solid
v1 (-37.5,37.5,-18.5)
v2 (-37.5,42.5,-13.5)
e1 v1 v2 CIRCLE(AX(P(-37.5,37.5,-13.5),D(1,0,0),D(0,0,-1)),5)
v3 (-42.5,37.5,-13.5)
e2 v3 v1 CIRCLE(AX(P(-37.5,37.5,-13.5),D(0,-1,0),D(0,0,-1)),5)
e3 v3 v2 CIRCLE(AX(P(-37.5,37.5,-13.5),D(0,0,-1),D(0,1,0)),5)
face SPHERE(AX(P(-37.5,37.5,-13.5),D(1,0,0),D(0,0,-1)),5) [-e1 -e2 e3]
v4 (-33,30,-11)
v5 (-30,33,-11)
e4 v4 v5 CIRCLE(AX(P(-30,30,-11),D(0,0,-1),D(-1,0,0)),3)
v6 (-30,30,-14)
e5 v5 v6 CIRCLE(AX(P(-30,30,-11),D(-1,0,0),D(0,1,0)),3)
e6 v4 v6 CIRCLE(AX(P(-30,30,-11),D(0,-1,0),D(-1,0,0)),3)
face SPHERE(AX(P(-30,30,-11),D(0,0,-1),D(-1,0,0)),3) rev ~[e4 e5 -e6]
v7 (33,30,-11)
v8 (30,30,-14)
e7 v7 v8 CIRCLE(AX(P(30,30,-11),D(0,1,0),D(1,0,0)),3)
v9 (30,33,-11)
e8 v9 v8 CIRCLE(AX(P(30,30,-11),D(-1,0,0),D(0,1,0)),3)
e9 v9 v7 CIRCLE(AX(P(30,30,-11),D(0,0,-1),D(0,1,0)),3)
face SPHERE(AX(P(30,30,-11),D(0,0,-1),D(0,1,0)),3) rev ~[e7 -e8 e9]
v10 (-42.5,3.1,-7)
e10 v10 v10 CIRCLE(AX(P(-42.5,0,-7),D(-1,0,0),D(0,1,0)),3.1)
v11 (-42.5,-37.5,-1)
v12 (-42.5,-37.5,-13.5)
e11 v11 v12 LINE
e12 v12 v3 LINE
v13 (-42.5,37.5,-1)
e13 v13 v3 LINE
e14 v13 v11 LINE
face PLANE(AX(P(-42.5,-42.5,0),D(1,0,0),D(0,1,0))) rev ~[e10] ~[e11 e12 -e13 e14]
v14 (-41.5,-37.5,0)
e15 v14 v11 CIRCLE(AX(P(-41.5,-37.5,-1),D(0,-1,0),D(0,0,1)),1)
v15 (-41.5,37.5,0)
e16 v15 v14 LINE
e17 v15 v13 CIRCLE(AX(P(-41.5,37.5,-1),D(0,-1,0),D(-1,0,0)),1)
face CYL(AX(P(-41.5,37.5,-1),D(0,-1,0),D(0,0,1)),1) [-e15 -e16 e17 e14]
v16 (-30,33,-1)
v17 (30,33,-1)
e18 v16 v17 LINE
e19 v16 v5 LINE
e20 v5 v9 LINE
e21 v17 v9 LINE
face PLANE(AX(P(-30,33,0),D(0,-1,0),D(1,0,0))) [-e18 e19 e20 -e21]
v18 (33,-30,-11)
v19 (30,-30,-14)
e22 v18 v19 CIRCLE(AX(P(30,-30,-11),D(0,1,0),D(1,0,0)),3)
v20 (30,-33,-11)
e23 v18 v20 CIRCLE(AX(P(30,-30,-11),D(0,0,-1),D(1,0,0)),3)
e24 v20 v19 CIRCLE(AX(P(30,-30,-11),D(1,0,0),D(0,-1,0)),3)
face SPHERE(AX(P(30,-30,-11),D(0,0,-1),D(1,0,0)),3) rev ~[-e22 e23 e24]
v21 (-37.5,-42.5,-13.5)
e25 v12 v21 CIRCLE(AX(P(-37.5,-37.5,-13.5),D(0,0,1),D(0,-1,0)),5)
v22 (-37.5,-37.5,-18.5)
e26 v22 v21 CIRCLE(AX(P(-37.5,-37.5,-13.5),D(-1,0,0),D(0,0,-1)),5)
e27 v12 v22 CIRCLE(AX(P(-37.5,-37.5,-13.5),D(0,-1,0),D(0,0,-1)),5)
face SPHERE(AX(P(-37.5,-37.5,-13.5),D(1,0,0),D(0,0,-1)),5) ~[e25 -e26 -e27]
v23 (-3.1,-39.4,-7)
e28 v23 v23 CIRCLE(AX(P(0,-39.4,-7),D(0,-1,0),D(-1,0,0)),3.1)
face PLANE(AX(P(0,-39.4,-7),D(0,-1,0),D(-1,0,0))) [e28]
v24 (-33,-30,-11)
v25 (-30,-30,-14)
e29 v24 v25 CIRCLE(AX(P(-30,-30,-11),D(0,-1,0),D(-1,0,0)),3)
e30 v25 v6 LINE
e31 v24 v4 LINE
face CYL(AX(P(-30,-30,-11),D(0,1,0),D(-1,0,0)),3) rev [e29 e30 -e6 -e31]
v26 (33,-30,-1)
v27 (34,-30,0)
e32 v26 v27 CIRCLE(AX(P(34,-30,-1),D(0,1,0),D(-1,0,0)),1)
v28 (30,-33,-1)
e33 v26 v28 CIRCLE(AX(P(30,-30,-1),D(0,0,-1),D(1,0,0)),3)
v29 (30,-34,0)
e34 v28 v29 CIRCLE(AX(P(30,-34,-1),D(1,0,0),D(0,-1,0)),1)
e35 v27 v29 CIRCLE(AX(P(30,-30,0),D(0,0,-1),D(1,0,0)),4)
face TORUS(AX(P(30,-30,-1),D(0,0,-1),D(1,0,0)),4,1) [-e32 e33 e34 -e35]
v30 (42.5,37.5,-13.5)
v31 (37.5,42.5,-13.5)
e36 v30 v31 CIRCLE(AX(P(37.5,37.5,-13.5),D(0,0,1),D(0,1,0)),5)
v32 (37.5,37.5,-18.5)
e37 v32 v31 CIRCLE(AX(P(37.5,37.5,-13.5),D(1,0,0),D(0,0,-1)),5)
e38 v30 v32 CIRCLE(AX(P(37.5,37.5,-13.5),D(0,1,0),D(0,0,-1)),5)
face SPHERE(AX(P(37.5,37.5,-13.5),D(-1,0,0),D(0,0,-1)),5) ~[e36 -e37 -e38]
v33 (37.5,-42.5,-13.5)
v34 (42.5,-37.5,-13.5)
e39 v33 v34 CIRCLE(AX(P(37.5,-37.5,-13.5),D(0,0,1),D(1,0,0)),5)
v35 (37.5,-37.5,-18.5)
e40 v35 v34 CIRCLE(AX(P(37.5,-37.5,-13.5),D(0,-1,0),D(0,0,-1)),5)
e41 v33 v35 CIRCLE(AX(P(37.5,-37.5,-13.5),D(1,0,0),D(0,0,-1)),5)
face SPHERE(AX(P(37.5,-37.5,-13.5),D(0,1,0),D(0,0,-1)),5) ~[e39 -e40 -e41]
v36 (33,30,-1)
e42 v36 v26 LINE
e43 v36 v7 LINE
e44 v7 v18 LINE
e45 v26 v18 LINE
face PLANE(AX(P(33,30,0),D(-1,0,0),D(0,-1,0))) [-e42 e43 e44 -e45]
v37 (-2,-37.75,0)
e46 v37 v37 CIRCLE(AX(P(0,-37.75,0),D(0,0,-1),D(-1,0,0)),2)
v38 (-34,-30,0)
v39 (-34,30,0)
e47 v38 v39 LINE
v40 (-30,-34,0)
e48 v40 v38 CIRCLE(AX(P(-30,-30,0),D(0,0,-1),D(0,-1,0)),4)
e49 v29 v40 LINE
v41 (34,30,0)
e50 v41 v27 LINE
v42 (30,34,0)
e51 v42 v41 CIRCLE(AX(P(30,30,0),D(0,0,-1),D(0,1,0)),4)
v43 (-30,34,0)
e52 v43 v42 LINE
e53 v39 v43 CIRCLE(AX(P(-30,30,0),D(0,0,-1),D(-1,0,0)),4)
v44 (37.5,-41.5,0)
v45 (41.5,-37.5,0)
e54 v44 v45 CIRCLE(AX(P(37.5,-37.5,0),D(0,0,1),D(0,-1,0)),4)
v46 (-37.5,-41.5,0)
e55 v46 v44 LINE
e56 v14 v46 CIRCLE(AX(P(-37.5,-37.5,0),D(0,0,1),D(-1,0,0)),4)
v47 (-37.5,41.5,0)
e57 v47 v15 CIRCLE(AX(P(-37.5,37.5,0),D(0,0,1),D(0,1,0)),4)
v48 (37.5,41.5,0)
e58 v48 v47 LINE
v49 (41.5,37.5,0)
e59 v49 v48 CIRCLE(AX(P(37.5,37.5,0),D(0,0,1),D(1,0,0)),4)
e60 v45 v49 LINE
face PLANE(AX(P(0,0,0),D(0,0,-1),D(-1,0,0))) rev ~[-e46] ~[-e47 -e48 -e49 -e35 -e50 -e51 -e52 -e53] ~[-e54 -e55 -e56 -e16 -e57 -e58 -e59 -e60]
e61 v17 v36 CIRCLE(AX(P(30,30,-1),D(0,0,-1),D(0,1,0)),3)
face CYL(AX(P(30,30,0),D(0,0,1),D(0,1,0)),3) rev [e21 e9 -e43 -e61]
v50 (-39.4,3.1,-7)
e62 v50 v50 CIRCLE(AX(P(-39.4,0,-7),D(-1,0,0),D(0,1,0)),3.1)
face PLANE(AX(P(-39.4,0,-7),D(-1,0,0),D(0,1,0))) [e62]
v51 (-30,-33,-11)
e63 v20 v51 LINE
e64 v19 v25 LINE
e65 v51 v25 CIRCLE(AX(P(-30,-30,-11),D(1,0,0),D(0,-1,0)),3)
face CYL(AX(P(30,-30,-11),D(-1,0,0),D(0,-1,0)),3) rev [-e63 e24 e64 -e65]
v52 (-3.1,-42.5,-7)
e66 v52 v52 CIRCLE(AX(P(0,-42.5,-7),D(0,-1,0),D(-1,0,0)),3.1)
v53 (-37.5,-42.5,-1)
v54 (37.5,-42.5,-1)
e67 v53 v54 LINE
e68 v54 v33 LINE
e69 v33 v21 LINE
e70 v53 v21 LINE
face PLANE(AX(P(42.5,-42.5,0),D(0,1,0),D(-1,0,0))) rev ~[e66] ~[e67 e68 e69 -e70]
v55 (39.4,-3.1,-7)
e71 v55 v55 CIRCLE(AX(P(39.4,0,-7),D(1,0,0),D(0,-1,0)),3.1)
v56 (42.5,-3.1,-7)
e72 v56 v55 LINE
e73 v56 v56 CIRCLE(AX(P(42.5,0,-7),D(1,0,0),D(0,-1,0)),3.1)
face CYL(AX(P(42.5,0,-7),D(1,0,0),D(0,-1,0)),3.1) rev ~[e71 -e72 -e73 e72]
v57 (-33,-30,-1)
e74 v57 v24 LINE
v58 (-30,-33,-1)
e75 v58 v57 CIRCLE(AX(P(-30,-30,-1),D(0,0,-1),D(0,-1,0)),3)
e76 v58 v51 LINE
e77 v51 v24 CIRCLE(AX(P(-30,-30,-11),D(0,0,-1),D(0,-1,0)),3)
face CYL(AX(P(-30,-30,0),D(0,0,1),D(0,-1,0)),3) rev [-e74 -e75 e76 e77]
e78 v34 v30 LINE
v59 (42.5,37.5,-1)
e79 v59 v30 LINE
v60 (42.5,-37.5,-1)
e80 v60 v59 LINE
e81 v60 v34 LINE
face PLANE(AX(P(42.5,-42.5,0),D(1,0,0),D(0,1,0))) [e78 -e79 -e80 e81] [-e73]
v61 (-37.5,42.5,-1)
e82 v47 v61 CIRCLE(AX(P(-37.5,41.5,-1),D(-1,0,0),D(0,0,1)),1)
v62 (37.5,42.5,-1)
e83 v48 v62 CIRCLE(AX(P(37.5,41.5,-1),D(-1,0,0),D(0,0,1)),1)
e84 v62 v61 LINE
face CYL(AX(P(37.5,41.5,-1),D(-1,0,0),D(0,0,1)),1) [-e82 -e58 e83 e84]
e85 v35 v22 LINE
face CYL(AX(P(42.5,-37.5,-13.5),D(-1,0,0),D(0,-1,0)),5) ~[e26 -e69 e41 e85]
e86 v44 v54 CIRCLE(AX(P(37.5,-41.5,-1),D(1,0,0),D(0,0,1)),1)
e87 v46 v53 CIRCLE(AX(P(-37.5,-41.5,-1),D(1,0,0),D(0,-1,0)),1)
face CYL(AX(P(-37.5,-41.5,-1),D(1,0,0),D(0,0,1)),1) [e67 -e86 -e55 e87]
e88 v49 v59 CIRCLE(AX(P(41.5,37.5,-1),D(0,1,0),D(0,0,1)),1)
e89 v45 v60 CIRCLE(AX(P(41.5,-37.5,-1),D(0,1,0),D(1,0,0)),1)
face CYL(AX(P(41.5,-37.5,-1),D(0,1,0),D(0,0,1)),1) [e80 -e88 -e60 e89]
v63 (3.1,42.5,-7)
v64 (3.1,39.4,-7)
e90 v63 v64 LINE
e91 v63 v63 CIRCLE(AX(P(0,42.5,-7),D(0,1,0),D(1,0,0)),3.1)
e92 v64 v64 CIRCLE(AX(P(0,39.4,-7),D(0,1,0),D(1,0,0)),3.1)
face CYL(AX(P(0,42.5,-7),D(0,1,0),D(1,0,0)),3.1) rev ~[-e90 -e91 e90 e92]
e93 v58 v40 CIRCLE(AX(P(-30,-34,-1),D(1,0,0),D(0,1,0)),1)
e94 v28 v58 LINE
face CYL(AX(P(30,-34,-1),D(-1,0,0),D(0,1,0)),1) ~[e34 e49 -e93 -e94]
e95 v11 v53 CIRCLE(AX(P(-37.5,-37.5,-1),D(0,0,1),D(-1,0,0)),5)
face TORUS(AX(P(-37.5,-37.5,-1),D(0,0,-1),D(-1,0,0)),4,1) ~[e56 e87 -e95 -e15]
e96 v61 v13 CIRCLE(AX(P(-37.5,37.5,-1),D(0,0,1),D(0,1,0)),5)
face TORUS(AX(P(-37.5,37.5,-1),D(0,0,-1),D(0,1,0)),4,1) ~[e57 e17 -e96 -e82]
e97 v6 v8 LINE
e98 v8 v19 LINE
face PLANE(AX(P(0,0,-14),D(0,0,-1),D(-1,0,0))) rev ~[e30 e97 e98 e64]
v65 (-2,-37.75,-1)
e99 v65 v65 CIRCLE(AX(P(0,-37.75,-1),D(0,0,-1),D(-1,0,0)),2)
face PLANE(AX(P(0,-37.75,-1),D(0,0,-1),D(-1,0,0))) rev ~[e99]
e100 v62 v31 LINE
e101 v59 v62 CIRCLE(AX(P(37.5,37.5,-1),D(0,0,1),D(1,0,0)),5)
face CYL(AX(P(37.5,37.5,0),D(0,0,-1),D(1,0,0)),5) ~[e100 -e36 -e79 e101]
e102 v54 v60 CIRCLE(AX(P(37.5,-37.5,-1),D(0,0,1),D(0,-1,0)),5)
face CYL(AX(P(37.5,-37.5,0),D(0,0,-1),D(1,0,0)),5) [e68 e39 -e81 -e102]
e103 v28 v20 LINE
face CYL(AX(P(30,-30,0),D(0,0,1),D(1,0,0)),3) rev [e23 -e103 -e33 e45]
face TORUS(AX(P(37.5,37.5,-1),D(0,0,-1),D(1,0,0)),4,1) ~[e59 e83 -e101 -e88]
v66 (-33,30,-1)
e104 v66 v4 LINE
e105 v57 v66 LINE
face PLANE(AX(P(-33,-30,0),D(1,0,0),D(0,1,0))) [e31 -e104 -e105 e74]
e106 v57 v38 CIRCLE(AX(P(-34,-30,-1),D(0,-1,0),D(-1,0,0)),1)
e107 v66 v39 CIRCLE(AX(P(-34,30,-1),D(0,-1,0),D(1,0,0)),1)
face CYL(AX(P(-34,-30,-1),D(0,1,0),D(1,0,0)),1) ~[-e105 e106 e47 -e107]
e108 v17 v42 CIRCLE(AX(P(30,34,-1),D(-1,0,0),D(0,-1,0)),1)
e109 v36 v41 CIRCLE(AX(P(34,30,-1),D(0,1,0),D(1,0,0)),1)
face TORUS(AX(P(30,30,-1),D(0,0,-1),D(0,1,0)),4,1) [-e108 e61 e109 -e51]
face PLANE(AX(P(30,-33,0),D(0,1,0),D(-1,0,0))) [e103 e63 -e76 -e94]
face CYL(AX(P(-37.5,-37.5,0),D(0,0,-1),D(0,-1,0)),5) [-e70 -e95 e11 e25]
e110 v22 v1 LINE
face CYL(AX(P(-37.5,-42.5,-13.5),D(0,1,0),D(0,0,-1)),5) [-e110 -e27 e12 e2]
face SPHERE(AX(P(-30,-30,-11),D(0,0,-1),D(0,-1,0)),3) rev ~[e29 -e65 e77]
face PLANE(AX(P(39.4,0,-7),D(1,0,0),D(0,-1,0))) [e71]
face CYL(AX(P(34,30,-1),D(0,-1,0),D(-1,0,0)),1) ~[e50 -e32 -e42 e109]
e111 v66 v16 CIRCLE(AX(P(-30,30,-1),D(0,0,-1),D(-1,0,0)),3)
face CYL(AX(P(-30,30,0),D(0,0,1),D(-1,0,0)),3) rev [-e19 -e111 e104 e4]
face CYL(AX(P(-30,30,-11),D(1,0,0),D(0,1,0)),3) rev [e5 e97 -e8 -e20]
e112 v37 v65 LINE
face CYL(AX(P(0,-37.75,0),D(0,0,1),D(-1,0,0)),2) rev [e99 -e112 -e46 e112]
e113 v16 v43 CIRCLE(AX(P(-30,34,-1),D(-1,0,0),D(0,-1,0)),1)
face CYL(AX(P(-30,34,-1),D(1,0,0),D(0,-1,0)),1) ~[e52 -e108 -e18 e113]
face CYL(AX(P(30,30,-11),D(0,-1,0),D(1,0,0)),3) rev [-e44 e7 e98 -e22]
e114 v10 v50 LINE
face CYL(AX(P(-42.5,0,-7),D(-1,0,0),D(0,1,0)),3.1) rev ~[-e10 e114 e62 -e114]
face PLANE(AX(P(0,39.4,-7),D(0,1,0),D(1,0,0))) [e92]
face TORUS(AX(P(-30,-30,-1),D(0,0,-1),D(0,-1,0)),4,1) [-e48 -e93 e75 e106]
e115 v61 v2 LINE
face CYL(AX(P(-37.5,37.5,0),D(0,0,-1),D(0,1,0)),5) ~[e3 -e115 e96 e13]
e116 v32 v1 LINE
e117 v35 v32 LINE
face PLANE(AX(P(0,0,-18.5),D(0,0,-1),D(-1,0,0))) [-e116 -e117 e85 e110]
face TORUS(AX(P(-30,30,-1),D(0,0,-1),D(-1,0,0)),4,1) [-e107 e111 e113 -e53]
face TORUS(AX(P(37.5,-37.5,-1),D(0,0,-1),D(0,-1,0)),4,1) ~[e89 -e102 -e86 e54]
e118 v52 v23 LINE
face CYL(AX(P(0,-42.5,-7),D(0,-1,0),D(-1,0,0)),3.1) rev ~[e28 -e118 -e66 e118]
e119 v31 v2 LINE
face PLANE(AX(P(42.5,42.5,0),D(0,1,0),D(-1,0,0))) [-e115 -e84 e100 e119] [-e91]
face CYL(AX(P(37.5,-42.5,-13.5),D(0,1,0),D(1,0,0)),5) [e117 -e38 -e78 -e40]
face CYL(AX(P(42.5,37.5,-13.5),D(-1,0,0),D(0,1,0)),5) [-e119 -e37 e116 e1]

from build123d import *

# Parameters (mm, degrees)
F0_W      = 85
F0_H      = 85
F0_R      = 2
F3_DEPTH  = 18.5
F4_DEPTH  = 14
F5_R      = 5
F6_R      = 3
F7_R      = 1
F8_R      = 3.1
F9_DEPTH  = 3.1
F10_R     = 3.1
F11_DEPTH = 3.1
F12_R     = 3.1
F13_DEPTH = 3.1
F14_R     = 3.1
F15_DEPTH = 3.1
F16_DEPTH = 1
F17_ANGLE = 180


# Not quite as in the source:
# - a feature names something its author has since deleted; it is built from what else it names


with BuildPart() as f3:
    # F0 (on Top) → F3 (new body)
    with BuildSketch(Plane.XY):
        Rectangle(F0_W, F0_H)
        with Locations((0, -37.75)):
            Circle(F0_R, mode=Mode.SUBTRACT)
        with BuildLine():
            ThreePointArc((-33, 30), (-32.1213203436, 32.1213203436), (-30, 33))
            Line((-30, 33), (30, 33))
            ThreePointArc((30, 33), (32.1213203436, 32.1213203436), (33, 30))
            Line((33, 30), (33, -30))
            ThreePointArc((33, -30), (32.1213203436, -32.1213203436), (30, -33))
            Line((30, -33), (-30, -33))
            ThreePointArc((-30, -33), (-32.1213203436, -32.1213203436), (-33, -30))
            Line((-33, -30), (-33, 30))
        make_face(mode=Mode.SUBTRACT)
        with BuildLine():
            Line((30, 33), (-30, 33))
            ThreePointArc((-30, 33), (-32.1213203436, 32.1213203436), (-33, 30))
            Line((-33, 30), (-33, -30))
            ThreePointArc((-33, -30), (-32.1213203436, -32.1213203436), (-30, -33))
            Line((-30, -33), (30, -33))
            ThreePointArc((30, -33), (32.1213203436, -32.1213203436), (33, -30))
            Line((33, -30), (33, 30))
            ThreePointArc((33, 30), (32.1213203436, 32.1213203436), (30, 33))
        make_face()
        with Locations((0, -37.75)):
            Circle(F0_R)
    extrude(amount=F3_DEPTH)

    # F0 (on Top) → F4 (cut)
    with BuildSketch(Plane.XY):
        with BuildLine():
            Line((30, 33), (-30, 33))
            ThreePointArc((-30, 33), (-32.1213203436, 32.1213203436), (-33, 30))
            Line((-33, 30), (-33, -30))
            ThreePointArc((-33, -30), (-32.1213203436, -32.1213203436), (-30, -33))
            Line((-30, -33), (30, -33))
            ThreePointArc((30, -33), (32.1213203436, -32.1213203436), (33, -30))
            Line((33, -30), (33, 30))
            ThreePointArc((33, 30), (32.1213203436, 32.1213203436), (30, 33))
        make_face()
    extrude(amount=F4_DEPTH, mode=Mode.SUBTRACT)

    # F5
    f5_edges = [f3.edges().sort_by_distance(p)[0] for p in [
        (0, 42.5, 18.5),
        (-42.5, 0, 18.5),
        (0, -42.5, 18.5),
        (42.5, 0, 18.5),
        (42.5, 42.5, 9.25),
        (-42.5, 42.5, 9.25),
        (-42.5, -42.5, 9.25),
        (42.5, -42.5, 9.25),
    ]]
    fillet(f5_edges, radius=F5_R)

    # F6
    f6_edges = [f3.edges().sort_by_distance(p)[0] for p in [
        (0, 33, 14),
        (-32.12132, 32.12132, 14),
        (-33, 0, 14),
        (-32.12132, -32.12132, 14),
        (0, -33, 14),
        (32.12132, -32.12132, 14),
        (33, 0, 14),
        (32.12132, 32.12132, 14),
    ]]
    fillet(f6_edges, radius=F6_R)

    # F7
    f7_edges = [f3.edges().sort_by_distance(p)[0] for p in [
        (0, 42.5, 0),
        (41.035534, 41.035534, 0),
        (-41.035534, 41.035534, 0),
        (42.5, 0, 0),
        (-42.5, 0, 0),
        (41.035534, -41.035534, 0),
        (-41.035534, -41.035534, 0),
        (0, -42.5, 0),
        (0, 33, 0),
        (-32.12132, 32.12132, 0),
        (-33, 0, 0),
        (-32.12132, -32.12132, 0),
        (0, -33, 0),
        (32.12132, -32.12132, 0),
        (33, 0, 0),
        (32.12132, 32.12132, 0),
    ]]
    fillet(f7_edges, radius=F7_R)

    # F8 (on face) → F9 (cut)
    with BuildSketch(Plane.XZ.offset(42.5)):
        with Locations((0, 7)):
            Circle(F8_R)
    extrude(amount=-F9_DEPTH, mode=Mode.SUBTRACT)

    # F10 (on face) → F11 (cut)
    with BuildSketch(Plane(origin=(0, 42.5, 0), x_dir=(-1, 0, 0), z_dir=(0, 1, 0))):
        with Locations((0, 7)):
            Circle(F10_R)
    extrude(amount=-F11_DEPTH, mode=Mode.SUBTRACT)

    # F12 (on face) → F13 (cut)
    with BuildSketch(Plane(origin=(-42.5, 0, 0), x_dir=(0, -1, 0), z_dir=(-1, 0, 0))):
        with Locations((0, 7)):
            Circle(F12_R)
    extrude(amount=-F13_DEPTH, mode=Mode.SUBTRACT)

    # F14 (on face) → F15 (cut)
    with BuildSketch(Plane.YZ.offset(42.5)):
        with Locations((0, 7)):
            Circle(F14_R)
    extrude(amount=-F15_DEPTH, mode=Mode.SUBTRACT)

    # F0 (on Top) → F16 (cut)
    with BuildSketch(Plane.XY):
        with Locations((0, -37.75)):
            Circle(F0_R)
    extrude(amount=F16_DEPTH, mode=Mode.SUBTRACT)


with BuildPart() as f3_1:
    # F17: moved
    add(f3.part.rotate(Axis((0, 0, 0), (0, 1, 0)), F17_ANGLE))


solid = f3_1.part
